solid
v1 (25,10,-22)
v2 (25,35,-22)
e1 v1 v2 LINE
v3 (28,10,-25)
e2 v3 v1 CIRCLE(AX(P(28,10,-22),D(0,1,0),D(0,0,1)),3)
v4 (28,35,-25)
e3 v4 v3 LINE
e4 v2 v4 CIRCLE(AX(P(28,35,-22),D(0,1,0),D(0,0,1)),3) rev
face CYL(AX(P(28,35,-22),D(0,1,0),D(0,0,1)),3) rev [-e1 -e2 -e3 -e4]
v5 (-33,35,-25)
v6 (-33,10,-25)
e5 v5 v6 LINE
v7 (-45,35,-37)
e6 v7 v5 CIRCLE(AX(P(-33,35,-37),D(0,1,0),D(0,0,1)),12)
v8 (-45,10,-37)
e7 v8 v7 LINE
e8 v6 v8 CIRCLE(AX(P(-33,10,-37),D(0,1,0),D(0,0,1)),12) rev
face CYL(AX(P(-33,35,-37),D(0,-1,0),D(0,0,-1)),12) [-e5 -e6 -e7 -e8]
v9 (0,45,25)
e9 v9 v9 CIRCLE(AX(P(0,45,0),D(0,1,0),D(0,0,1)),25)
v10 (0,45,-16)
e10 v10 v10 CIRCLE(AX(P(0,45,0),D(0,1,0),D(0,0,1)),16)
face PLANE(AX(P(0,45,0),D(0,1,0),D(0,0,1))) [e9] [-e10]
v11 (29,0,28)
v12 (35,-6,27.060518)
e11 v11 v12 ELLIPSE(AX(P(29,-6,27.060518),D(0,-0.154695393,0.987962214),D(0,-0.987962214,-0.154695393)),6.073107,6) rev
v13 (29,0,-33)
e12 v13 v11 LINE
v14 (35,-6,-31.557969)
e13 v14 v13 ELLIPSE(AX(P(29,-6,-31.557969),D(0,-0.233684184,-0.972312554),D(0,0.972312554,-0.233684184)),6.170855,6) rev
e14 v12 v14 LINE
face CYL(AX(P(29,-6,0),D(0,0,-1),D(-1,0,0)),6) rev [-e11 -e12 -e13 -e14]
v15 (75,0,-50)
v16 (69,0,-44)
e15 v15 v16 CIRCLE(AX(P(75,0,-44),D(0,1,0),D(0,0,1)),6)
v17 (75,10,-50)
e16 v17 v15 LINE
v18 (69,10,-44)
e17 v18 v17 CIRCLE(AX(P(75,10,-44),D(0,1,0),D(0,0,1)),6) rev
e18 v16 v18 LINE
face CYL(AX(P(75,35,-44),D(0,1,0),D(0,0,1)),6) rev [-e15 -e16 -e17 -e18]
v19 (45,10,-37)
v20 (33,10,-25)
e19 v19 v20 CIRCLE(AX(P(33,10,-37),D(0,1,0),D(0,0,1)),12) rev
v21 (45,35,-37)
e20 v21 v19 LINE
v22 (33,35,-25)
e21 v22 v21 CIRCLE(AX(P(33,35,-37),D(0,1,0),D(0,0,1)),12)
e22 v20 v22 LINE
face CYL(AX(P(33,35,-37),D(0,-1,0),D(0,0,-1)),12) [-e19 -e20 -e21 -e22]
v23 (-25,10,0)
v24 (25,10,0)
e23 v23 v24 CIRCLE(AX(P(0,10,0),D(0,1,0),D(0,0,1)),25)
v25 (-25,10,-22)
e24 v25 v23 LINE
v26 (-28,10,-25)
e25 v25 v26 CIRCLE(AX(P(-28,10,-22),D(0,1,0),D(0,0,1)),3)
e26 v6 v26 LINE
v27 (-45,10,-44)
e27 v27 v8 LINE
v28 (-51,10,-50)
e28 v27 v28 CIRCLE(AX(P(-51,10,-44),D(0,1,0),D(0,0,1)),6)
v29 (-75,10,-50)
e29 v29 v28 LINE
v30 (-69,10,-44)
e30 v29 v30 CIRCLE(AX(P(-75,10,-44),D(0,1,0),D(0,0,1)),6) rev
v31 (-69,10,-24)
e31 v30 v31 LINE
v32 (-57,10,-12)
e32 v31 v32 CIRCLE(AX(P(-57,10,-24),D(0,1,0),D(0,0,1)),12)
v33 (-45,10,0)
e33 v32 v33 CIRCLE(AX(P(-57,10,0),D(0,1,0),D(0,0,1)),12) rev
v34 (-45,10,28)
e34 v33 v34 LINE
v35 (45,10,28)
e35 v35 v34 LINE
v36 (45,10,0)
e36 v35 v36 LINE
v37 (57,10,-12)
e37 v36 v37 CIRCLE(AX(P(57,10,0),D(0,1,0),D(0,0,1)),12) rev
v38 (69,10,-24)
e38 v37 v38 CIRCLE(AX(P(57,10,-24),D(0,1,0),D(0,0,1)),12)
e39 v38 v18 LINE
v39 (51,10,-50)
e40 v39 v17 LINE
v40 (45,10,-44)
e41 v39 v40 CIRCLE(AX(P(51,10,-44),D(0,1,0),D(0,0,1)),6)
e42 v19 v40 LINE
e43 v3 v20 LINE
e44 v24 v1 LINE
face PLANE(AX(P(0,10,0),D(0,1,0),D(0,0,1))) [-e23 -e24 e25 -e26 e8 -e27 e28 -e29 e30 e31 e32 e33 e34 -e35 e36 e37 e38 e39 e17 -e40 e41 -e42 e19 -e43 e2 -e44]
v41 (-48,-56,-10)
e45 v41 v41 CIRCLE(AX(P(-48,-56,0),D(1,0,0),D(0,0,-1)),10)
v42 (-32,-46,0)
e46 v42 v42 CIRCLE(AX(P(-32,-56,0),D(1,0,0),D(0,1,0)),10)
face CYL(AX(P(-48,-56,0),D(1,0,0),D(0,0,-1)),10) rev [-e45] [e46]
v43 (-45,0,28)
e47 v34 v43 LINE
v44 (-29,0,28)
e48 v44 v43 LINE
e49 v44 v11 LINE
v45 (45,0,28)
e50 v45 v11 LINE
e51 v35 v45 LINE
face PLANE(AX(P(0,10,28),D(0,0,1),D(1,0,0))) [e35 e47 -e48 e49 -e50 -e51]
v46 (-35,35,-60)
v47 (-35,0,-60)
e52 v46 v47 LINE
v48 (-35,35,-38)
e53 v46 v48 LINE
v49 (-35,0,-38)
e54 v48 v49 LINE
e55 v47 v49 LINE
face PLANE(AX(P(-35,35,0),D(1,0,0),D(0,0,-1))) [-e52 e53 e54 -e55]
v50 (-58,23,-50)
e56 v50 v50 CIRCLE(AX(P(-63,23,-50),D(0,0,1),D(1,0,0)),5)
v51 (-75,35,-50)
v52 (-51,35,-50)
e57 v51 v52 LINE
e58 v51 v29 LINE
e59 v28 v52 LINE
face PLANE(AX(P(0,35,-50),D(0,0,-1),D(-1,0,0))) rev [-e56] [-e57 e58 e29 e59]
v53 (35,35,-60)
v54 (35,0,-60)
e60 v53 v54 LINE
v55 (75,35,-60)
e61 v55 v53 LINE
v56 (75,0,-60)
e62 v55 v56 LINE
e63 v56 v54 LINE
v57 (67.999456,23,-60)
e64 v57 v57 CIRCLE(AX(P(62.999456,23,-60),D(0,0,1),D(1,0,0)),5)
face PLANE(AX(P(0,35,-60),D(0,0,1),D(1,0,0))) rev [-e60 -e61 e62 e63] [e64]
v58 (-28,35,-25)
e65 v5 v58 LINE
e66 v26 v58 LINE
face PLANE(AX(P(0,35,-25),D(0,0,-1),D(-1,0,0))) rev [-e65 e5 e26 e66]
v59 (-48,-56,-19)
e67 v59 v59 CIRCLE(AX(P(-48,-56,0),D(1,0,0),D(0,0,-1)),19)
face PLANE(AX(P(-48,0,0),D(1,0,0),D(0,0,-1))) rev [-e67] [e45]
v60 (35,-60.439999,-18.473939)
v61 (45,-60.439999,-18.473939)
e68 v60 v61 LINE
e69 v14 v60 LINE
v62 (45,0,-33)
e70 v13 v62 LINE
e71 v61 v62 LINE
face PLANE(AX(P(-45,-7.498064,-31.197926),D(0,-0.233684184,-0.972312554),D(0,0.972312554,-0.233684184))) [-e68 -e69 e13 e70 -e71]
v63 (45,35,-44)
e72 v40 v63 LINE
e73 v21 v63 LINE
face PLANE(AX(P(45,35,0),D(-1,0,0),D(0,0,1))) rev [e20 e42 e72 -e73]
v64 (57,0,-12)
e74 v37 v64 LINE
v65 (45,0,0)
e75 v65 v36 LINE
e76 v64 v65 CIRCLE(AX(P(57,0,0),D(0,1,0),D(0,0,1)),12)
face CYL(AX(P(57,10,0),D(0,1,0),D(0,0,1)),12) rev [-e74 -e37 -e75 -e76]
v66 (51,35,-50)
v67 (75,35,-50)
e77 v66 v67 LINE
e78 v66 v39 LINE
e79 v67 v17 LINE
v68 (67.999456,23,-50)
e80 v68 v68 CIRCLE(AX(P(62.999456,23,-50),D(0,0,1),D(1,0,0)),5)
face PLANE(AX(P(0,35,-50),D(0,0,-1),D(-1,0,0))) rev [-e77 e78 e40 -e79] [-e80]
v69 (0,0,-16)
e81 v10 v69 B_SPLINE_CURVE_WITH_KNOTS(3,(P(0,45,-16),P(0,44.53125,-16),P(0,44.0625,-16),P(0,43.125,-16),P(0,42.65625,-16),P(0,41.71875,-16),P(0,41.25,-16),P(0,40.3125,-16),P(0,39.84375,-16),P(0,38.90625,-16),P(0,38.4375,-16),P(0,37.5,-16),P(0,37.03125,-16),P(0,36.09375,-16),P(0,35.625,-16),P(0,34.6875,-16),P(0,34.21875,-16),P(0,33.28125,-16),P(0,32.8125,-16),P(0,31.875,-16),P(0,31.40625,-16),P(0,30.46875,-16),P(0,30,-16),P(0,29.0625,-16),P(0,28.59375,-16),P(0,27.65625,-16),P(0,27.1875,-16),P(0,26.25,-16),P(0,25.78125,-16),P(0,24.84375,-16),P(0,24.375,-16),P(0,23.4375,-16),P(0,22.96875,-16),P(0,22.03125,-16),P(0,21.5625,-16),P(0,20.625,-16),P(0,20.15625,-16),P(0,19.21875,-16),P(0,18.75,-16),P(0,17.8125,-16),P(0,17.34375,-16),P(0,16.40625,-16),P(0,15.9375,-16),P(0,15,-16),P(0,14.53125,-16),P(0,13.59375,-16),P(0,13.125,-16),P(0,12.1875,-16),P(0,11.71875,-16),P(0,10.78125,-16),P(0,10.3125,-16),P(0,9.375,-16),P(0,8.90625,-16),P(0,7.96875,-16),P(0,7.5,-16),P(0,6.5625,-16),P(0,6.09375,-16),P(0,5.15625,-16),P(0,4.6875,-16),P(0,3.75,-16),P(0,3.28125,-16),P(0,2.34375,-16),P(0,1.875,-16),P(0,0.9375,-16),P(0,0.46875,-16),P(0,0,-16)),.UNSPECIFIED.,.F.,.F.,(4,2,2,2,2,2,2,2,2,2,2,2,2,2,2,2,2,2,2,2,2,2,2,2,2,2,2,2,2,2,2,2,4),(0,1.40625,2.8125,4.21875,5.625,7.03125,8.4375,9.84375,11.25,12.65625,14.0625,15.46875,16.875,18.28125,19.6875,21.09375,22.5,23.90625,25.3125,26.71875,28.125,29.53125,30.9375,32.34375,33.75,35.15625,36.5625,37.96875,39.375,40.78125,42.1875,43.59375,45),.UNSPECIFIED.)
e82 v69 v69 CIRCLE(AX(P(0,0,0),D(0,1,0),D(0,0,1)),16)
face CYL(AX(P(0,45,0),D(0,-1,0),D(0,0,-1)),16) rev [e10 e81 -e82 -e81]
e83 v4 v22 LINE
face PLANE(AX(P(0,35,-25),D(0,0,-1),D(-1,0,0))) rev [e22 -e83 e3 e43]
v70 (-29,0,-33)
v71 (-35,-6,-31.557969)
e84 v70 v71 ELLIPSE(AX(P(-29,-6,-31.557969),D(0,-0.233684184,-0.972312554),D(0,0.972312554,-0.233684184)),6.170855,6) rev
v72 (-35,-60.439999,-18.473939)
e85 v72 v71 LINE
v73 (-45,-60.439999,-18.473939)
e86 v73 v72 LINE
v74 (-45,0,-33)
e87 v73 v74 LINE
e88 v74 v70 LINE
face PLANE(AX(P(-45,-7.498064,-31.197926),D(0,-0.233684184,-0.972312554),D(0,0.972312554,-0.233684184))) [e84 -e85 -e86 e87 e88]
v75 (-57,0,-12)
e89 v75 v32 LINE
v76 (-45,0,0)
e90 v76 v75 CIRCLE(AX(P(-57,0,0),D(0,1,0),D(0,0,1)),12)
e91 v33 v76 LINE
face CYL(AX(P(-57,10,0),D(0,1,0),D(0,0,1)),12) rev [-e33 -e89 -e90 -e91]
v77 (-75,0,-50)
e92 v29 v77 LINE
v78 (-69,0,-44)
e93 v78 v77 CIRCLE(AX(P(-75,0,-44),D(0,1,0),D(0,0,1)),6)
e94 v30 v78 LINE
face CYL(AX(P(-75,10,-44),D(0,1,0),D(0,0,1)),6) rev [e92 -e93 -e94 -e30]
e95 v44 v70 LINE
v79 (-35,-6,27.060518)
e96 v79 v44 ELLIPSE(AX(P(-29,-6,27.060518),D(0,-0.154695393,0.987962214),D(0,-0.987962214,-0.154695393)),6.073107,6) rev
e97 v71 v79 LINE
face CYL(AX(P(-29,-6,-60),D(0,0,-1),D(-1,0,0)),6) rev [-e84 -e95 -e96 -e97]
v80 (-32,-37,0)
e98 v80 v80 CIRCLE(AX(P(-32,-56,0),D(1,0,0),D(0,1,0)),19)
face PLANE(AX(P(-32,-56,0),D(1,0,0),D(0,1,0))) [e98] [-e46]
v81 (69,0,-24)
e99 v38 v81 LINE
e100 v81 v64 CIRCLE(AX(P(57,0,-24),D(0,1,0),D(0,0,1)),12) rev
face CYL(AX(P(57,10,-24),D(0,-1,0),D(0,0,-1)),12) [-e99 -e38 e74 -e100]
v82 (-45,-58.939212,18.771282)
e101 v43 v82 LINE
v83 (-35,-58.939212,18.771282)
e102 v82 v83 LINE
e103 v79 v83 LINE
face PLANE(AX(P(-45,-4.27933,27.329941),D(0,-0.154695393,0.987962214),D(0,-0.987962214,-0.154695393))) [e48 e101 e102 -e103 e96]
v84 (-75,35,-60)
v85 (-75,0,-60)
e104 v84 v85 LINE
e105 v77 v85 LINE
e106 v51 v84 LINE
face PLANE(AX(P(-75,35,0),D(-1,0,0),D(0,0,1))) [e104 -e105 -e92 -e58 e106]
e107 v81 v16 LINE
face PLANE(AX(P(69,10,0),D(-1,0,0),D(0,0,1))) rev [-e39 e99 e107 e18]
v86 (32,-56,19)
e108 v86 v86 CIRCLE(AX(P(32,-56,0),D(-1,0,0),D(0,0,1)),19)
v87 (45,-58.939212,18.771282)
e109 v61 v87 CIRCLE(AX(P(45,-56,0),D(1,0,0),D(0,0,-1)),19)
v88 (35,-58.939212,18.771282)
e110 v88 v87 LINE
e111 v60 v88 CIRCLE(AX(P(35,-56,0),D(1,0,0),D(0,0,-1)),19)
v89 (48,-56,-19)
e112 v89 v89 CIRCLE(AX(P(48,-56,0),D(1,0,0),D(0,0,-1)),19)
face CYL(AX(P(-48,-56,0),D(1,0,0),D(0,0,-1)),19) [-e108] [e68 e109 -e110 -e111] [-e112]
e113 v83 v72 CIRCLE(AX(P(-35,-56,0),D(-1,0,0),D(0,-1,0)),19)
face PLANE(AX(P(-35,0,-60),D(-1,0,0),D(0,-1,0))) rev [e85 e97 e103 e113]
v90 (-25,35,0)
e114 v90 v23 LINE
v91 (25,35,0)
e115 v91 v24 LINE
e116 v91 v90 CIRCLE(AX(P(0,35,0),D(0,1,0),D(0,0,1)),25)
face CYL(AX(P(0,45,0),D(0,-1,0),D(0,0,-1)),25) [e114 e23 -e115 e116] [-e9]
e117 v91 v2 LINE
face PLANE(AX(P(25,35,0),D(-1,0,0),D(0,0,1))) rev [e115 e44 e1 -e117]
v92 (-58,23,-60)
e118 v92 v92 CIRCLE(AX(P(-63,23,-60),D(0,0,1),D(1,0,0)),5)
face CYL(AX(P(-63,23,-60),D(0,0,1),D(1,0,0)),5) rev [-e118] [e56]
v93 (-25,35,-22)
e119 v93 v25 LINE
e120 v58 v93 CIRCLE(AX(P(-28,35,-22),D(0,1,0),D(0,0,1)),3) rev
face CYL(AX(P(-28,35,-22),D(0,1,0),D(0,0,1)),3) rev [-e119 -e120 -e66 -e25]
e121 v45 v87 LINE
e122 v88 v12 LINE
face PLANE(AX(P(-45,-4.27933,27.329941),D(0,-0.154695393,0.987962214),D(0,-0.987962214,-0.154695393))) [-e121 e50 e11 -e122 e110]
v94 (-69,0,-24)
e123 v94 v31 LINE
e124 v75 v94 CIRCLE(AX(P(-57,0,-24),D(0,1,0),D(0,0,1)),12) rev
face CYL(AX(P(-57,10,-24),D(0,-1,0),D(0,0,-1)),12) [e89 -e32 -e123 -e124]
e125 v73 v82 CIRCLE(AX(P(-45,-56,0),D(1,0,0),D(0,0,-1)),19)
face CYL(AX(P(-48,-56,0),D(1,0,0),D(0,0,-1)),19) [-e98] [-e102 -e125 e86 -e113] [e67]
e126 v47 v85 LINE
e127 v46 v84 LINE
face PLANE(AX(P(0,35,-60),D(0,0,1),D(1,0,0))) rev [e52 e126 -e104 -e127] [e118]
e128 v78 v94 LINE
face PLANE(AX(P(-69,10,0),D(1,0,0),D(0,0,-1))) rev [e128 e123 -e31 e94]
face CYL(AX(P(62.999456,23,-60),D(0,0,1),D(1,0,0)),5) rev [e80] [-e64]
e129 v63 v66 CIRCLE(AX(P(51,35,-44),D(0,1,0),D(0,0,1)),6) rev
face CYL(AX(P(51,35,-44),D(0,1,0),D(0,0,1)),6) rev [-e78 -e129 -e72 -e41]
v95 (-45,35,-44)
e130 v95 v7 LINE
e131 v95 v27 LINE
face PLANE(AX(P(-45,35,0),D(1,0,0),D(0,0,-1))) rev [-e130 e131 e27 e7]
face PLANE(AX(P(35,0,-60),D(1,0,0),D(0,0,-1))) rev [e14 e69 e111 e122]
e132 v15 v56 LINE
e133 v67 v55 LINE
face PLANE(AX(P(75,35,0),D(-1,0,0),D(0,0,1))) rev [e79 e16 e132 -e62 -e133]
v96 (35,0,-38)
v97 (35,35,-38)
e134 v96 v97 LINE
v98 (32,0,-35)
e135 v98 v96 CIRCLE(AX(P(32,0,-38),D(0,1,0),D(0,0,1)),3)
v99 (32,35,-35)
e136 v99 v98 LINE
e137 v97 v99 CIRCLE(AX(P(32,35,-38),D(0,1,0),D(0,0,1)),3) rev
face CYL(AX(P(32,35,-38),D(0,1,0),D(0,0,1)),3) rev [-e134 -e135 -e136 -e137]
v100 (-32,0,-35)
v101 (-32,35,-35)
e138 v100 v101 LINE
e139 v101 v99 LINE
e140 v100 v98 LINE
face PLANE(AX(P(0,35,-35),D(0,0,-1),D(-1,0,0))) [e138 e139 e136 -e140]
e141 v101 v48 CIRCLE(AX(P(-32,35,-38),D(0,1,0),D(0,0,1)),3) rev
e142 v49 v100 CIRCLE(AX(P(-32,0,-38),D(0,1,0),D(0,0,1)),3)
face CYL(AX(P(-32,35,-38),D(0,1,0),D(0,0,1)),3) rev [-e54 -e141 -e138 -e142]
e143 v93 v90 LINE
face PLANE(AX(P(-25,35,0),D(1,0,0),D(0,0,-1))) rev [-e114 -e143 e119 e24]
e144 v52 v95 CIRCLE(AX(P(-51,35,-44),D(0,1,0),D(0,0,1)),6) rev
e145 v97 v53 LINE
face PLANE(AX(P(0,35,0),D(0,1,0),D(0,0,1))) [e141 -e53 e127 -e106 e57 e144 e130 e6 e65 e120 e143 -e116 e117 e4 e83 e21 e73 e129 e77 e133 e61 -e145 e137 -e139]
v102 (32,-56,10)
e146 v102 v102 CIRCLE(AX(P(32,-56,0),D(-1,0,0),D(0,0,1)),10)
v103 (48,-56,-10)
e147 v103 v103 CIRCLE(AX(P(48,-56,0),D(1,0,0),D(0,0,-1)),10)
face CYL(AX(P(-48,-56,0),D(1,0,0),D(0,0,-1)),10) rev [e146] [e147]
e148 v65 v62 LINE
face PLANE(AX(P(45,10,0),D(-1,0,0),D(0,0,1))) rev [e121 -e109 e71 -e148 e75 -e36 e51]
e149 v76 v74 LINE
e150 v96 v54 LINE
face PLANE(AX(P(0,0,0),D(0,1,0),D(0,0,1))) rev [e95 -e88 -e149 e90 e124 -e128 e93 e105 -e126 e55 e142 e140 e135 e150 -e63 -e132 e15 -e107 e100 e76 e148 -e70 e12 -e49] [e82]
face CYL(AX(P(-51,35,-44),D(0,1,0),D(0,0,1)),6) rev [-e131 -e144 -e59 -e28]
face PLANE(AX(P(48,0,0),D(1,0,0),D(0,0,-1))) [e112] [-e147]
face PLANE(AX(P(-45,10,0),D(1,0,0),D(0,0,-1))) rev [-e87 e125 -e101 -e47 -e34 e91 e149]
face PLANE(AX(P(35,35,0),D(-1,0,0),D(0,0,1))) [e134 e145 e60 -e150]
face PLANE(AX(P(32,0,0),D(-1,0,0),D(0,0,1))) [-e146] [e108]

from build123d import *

# Parameters (mm, degrees)
SKETCH1_R                = 25
SKETCH1_R_2              = 16
BOSS_EXTRUDE1_DEPTH      = 45
BOSS_EXTRUDE2_DEPTH      = 10
BOSS_EXTRUDE3_DEPTH      = 35
FILLET1_R                = 12
FILLET2_R                = 12
FILLET3_R                = 6
FILLET4_R                = 12
FILLET5_R                = 3
FILLET6_R                = 6
BOSS_EXTRUDE4_DEPTH      = 48
BOSS_EXTRUDE4_DEPTH_BACK = 48
SKETCH2_R                = 19
SKETCH2_R_2              = 10
BOSS_EXTRUDE5_DEPTH      = 45
BOSS_EXTRUDE5_DEPTH_BACK = 45
SKETCH3_W                = 70
SKETCH3_H                = 86.046908332
CUT_EXTRUDE1_DEPTH       = 138.818721515
FILLET7_R                = 6
SKETCH4_R                = 5
CUT_EXTRUDE2_DEPTH       = 132.658649545
SKETCH6_R                = 19
SKETCH6_R_2              = 10
BOSS_EXTRUDE7_DEPTH      = 16
SKETCH7_R                = 19
SKETCH7_R_2              = 10
BOSS_EXTRUDE8_DEPTH      = 16


with BuildPart() as part:
    # Sketch1 → Boss-Extrude1 (new body)
    with BuildSketch(Plane(origin=(0, 0, 0), x_dir=(1, 0, 0), z_dir=(0, 1, 0))):
        with Locations(Location((0, 0, 0), (0, 0, 90))):
            Circle(SKETCH1_R)
        with Locations(Location((0, 0, 0), (0, 0, 90))):
            Circle(SKETCH1_R_2, mode=Mode.SUBTRACT)
    extrude(amount=BOSS_EXTRUDE1_DEPTH)

    # Sketch1<3> → Boss-Extrude2 (add)
    with BuildSketch(Plane(origin=(0, 0, 0), x_dir=(1, 0, 0), z_dir=(0, 1, 0))):
        with BuildLine():
            Line((-45, 50), (-69, 50))
            Line((-69, 50), (-69, 12))
            Line((-69, 12), (-45, 12))
            Line((-45, 12), (-45, -28))
            Line((-45, -28), (45, -28))
            Line((45, -28), (45, 12))
            Line((45, 12), (69, 12))
            Line((69, 12), (69, 50))
            Line((69, 50), (45, 50))
            Line((45, 50), (45, 25))
            Line((45, 25), (25, 25))
            Line((25, 25), (25, 0))
            ThreePointArc((25, 0), (0, -25), (-25, 0))
            Line((-25, 0), (-25, 25))
            Line((-25, 25), (-45, 25))
            Line((-45, 25), (-45, 50))
        make_face()
    extrude(amount=BOSS_EXTRUDE2_DEPTH)

    # Sketch1<4> → Boss-Extrude3 (add)
    with BuildSketch(Plane(origin=(0, 0, 0), x_dir=(1, 0, 0), z_dir=(0, 1, 0))):
        with BuildLine():
            Line((-35, 35), (-35, 60))
            Line((-35, 60), (-75, 60))
            Line((-75, 60), (-75, 50))
            Line((-75, 50), (-69, 50))
            Line((-69, 50), (-45, 50))
            Line((-45, 50), (-45, 25))
            Line((-45, 25), (-25, 25))
            Line((-25, 25), (-25, 0))
            ThreePointArc((-25, 0), (0, 25), (25, 0))
            Line((25, 0), (25, 25))
            Line((25, 25), (45, 25))
            Line((45, 25), (45, 50))
            Line((45, 50), (69, 50))
            Line((69, 50), (75, 50))
            Line((75, 50), (75, 60))
            Line((75, 60), (35, 60))
            Line((35, 60), (35, 35))
            Line((35, 35), (-35, 35))
        make_face()
    extrude(amount=BOSS_EXTRUDE3_DEPTH)

    # Fillet1
    fillet1_edges = [part.edges().sort_by_distance(p)[0] for p in [
        (45, 22.5, -25),
        (-45, 22.5, -25),
    ]]
    fillet(fillet1_edges, radius=FILLET1_R)

    # Fillet2
    fillet2_edges = [part.edges().sort_by_distance(p)[0] for p in [
        (-45, 5, -12),
        (45, 5, -12),
    ]]
    fillet(fillet2_edges, radius=FILLET2_R)

    # Fillet3
    fillet3_edges = [part.edges().sort_by_distance(p)[0] for p in [
        (69, 5, -50),
        (-69, 5, -50),
    ]]
    fillet(fillet3_edges, radius=FILLET3_R - 0.0001)  # a hair under: the kernel refuses the full size

    # Fillet4
    fillet4_edges = [part.edges().sort_by_distance(p)[0] for p in [
        (69, 5, -12),
        (-69, 5, -12),
    ]]
    fillet(fillet4_edges, radius=FILLET4_R - 0.0001)  # a hair under: the kernel refuses the full size

    # Fillet5
    fillet5_edges = [part.edges().sort_by_distance(p)[0] for p in [
        (25, 22.5, -25),
        (35, 17.5, -35),
        (-35, 17.5, -35),
        (-25, 22.5, -25),
    ]]
    fillet(fillet5_edges, radius=FILLET5_R)

    # Fillet6
    fillet6_edges = [part.edges().sort_by_distance(p)[0] for p in [
        (45, 22.5, -50),
        (-45, 22.5, -50),
    ]]
    fillet(fillet6_edges, radius=FILLET6_R)



with BuildPart() as body_2:
    # Sketch2 → Boss-Extrude4 (new, two sides: drawn at the far end of the back side and taken through both)
    with BuildSketch(Plane(origin=(0, 0, 0), x_dir=(0, 0, -1), z_dir=(1, 0, 0)).offset(-BOSS_EXTRUDE4_DEPTH_BACK)):
        with Locations((0, -56)):
            Circle(SKETCH2_R)
        with Locations((0, -56)):
            Circle(SKETCH2_R_2, mode=Mode.SUBTRACT)
    extrude(amount=BOSS_EXTRUDE4_DEPTH + BOSS_EXTRUDE4_DEPTH_BACK)


with BuildPart() as part_1:
    add(part.part)

    add(body_2.part)  # Boss-Extrude5 merges body 2
    # Sketch2<4> → Boss-Extrude5 (add, two sides: drawn at the far end of the back side and taken through both)
    with BuildSketch(Plane(origin=(0, 0, 0), x_dir=(0, 0, -1), z_dir=(1, 0, 0)).offset(-BOSS_EXTRUDE5_DEPTH_BACK)):
        with BuildLine():
            Line((0, 0), (-28, 0))
            Line((-28, 0), (-18.771282059, -58.939212458))
            ThreePointArc((-18.771282059, -58.939212458), (-1.474048996, -37.057265785), (19, -56))
            ThreePointArc((19, -56), (18.868026287, -58.235527685), (18.473938523, -60.439999487))
            Line((18.473938523, -60.439999487), (33, 0))
            Line((33, 0), (24, 0))
            Line((24, 0), (12, 0))
            Line((12, 0), (0, 0))
        make_face()
    extrude(amount=BOSS_EXTRUDE5_DEPTH + BOSS_EXTRUDE5_DEPTH_BACK)

    # Sketch3 → Cut-Extrude1 (cut, through all)
    with BuildSketch(Plane.XY.offset(28)):
        with Locations((0, -43.023454166)):
            Rectangle(SKETCH3_W, SKETCH3_H)
    extrude(amount=-CUT_EXTRUDE1_DEPTH, mode=Mode.SUBTRACT)

    # Fillet7
    fillet7_edges = [part_1.edges().sort_by_distance(p)[0] for p in [
        (-35, 0, -2.5),
        (35, 0, -2.5),
    ]]
    fillet(fillet7_edges, radius=FILLET7_R)

    # Sketch4 → Cut-Extrude2 (cut, through all)
    with BuildSketch(Plane.XY.offset(-50)):
        with Locations((-63, 23)):
            Circle(SKETCH4_R)
        with Locations((62.999455964, 23)):
            Circle(SKETCH4_R)
    extrude(amount=-CUT_EXTRUDE2_DEPTH, mode=Mode.SUBTRACT)

    # Sketch6 → Boss-Extrude7 (add)
    with BuildSketch(Plane(origin=(-32, 0, 0), x_dir=(0, 0, -1), z_dir=(1, 0, 0))):
        with Locations((0, -56)):
            Circle(SKETCH6_R)
        with Locations((0, -56)):
            Circle(SKETCH6_R_2, mode=Mode.SUBTRACT)
    extrude(amount=-BOSS_EXTRUDE7_DEPTH)

    # Sketch7 → Boss-Extrude8 (add)
    with BuildSketch(Plane.ZY.offset(-32)):
        with Locations(Location((0, -56, 0), (0, 0, 180))):
            Circle(SKETCH7_R)
        with Locations(Location((0, -56, 0), (0, 0, 180))):
            Circle(SKETCH7_R_2, mode=Mode.SUBTRACT)
    extrude(amount=-BOSS_EXTRUDE8_DEPTH)


solid = part_1.part
